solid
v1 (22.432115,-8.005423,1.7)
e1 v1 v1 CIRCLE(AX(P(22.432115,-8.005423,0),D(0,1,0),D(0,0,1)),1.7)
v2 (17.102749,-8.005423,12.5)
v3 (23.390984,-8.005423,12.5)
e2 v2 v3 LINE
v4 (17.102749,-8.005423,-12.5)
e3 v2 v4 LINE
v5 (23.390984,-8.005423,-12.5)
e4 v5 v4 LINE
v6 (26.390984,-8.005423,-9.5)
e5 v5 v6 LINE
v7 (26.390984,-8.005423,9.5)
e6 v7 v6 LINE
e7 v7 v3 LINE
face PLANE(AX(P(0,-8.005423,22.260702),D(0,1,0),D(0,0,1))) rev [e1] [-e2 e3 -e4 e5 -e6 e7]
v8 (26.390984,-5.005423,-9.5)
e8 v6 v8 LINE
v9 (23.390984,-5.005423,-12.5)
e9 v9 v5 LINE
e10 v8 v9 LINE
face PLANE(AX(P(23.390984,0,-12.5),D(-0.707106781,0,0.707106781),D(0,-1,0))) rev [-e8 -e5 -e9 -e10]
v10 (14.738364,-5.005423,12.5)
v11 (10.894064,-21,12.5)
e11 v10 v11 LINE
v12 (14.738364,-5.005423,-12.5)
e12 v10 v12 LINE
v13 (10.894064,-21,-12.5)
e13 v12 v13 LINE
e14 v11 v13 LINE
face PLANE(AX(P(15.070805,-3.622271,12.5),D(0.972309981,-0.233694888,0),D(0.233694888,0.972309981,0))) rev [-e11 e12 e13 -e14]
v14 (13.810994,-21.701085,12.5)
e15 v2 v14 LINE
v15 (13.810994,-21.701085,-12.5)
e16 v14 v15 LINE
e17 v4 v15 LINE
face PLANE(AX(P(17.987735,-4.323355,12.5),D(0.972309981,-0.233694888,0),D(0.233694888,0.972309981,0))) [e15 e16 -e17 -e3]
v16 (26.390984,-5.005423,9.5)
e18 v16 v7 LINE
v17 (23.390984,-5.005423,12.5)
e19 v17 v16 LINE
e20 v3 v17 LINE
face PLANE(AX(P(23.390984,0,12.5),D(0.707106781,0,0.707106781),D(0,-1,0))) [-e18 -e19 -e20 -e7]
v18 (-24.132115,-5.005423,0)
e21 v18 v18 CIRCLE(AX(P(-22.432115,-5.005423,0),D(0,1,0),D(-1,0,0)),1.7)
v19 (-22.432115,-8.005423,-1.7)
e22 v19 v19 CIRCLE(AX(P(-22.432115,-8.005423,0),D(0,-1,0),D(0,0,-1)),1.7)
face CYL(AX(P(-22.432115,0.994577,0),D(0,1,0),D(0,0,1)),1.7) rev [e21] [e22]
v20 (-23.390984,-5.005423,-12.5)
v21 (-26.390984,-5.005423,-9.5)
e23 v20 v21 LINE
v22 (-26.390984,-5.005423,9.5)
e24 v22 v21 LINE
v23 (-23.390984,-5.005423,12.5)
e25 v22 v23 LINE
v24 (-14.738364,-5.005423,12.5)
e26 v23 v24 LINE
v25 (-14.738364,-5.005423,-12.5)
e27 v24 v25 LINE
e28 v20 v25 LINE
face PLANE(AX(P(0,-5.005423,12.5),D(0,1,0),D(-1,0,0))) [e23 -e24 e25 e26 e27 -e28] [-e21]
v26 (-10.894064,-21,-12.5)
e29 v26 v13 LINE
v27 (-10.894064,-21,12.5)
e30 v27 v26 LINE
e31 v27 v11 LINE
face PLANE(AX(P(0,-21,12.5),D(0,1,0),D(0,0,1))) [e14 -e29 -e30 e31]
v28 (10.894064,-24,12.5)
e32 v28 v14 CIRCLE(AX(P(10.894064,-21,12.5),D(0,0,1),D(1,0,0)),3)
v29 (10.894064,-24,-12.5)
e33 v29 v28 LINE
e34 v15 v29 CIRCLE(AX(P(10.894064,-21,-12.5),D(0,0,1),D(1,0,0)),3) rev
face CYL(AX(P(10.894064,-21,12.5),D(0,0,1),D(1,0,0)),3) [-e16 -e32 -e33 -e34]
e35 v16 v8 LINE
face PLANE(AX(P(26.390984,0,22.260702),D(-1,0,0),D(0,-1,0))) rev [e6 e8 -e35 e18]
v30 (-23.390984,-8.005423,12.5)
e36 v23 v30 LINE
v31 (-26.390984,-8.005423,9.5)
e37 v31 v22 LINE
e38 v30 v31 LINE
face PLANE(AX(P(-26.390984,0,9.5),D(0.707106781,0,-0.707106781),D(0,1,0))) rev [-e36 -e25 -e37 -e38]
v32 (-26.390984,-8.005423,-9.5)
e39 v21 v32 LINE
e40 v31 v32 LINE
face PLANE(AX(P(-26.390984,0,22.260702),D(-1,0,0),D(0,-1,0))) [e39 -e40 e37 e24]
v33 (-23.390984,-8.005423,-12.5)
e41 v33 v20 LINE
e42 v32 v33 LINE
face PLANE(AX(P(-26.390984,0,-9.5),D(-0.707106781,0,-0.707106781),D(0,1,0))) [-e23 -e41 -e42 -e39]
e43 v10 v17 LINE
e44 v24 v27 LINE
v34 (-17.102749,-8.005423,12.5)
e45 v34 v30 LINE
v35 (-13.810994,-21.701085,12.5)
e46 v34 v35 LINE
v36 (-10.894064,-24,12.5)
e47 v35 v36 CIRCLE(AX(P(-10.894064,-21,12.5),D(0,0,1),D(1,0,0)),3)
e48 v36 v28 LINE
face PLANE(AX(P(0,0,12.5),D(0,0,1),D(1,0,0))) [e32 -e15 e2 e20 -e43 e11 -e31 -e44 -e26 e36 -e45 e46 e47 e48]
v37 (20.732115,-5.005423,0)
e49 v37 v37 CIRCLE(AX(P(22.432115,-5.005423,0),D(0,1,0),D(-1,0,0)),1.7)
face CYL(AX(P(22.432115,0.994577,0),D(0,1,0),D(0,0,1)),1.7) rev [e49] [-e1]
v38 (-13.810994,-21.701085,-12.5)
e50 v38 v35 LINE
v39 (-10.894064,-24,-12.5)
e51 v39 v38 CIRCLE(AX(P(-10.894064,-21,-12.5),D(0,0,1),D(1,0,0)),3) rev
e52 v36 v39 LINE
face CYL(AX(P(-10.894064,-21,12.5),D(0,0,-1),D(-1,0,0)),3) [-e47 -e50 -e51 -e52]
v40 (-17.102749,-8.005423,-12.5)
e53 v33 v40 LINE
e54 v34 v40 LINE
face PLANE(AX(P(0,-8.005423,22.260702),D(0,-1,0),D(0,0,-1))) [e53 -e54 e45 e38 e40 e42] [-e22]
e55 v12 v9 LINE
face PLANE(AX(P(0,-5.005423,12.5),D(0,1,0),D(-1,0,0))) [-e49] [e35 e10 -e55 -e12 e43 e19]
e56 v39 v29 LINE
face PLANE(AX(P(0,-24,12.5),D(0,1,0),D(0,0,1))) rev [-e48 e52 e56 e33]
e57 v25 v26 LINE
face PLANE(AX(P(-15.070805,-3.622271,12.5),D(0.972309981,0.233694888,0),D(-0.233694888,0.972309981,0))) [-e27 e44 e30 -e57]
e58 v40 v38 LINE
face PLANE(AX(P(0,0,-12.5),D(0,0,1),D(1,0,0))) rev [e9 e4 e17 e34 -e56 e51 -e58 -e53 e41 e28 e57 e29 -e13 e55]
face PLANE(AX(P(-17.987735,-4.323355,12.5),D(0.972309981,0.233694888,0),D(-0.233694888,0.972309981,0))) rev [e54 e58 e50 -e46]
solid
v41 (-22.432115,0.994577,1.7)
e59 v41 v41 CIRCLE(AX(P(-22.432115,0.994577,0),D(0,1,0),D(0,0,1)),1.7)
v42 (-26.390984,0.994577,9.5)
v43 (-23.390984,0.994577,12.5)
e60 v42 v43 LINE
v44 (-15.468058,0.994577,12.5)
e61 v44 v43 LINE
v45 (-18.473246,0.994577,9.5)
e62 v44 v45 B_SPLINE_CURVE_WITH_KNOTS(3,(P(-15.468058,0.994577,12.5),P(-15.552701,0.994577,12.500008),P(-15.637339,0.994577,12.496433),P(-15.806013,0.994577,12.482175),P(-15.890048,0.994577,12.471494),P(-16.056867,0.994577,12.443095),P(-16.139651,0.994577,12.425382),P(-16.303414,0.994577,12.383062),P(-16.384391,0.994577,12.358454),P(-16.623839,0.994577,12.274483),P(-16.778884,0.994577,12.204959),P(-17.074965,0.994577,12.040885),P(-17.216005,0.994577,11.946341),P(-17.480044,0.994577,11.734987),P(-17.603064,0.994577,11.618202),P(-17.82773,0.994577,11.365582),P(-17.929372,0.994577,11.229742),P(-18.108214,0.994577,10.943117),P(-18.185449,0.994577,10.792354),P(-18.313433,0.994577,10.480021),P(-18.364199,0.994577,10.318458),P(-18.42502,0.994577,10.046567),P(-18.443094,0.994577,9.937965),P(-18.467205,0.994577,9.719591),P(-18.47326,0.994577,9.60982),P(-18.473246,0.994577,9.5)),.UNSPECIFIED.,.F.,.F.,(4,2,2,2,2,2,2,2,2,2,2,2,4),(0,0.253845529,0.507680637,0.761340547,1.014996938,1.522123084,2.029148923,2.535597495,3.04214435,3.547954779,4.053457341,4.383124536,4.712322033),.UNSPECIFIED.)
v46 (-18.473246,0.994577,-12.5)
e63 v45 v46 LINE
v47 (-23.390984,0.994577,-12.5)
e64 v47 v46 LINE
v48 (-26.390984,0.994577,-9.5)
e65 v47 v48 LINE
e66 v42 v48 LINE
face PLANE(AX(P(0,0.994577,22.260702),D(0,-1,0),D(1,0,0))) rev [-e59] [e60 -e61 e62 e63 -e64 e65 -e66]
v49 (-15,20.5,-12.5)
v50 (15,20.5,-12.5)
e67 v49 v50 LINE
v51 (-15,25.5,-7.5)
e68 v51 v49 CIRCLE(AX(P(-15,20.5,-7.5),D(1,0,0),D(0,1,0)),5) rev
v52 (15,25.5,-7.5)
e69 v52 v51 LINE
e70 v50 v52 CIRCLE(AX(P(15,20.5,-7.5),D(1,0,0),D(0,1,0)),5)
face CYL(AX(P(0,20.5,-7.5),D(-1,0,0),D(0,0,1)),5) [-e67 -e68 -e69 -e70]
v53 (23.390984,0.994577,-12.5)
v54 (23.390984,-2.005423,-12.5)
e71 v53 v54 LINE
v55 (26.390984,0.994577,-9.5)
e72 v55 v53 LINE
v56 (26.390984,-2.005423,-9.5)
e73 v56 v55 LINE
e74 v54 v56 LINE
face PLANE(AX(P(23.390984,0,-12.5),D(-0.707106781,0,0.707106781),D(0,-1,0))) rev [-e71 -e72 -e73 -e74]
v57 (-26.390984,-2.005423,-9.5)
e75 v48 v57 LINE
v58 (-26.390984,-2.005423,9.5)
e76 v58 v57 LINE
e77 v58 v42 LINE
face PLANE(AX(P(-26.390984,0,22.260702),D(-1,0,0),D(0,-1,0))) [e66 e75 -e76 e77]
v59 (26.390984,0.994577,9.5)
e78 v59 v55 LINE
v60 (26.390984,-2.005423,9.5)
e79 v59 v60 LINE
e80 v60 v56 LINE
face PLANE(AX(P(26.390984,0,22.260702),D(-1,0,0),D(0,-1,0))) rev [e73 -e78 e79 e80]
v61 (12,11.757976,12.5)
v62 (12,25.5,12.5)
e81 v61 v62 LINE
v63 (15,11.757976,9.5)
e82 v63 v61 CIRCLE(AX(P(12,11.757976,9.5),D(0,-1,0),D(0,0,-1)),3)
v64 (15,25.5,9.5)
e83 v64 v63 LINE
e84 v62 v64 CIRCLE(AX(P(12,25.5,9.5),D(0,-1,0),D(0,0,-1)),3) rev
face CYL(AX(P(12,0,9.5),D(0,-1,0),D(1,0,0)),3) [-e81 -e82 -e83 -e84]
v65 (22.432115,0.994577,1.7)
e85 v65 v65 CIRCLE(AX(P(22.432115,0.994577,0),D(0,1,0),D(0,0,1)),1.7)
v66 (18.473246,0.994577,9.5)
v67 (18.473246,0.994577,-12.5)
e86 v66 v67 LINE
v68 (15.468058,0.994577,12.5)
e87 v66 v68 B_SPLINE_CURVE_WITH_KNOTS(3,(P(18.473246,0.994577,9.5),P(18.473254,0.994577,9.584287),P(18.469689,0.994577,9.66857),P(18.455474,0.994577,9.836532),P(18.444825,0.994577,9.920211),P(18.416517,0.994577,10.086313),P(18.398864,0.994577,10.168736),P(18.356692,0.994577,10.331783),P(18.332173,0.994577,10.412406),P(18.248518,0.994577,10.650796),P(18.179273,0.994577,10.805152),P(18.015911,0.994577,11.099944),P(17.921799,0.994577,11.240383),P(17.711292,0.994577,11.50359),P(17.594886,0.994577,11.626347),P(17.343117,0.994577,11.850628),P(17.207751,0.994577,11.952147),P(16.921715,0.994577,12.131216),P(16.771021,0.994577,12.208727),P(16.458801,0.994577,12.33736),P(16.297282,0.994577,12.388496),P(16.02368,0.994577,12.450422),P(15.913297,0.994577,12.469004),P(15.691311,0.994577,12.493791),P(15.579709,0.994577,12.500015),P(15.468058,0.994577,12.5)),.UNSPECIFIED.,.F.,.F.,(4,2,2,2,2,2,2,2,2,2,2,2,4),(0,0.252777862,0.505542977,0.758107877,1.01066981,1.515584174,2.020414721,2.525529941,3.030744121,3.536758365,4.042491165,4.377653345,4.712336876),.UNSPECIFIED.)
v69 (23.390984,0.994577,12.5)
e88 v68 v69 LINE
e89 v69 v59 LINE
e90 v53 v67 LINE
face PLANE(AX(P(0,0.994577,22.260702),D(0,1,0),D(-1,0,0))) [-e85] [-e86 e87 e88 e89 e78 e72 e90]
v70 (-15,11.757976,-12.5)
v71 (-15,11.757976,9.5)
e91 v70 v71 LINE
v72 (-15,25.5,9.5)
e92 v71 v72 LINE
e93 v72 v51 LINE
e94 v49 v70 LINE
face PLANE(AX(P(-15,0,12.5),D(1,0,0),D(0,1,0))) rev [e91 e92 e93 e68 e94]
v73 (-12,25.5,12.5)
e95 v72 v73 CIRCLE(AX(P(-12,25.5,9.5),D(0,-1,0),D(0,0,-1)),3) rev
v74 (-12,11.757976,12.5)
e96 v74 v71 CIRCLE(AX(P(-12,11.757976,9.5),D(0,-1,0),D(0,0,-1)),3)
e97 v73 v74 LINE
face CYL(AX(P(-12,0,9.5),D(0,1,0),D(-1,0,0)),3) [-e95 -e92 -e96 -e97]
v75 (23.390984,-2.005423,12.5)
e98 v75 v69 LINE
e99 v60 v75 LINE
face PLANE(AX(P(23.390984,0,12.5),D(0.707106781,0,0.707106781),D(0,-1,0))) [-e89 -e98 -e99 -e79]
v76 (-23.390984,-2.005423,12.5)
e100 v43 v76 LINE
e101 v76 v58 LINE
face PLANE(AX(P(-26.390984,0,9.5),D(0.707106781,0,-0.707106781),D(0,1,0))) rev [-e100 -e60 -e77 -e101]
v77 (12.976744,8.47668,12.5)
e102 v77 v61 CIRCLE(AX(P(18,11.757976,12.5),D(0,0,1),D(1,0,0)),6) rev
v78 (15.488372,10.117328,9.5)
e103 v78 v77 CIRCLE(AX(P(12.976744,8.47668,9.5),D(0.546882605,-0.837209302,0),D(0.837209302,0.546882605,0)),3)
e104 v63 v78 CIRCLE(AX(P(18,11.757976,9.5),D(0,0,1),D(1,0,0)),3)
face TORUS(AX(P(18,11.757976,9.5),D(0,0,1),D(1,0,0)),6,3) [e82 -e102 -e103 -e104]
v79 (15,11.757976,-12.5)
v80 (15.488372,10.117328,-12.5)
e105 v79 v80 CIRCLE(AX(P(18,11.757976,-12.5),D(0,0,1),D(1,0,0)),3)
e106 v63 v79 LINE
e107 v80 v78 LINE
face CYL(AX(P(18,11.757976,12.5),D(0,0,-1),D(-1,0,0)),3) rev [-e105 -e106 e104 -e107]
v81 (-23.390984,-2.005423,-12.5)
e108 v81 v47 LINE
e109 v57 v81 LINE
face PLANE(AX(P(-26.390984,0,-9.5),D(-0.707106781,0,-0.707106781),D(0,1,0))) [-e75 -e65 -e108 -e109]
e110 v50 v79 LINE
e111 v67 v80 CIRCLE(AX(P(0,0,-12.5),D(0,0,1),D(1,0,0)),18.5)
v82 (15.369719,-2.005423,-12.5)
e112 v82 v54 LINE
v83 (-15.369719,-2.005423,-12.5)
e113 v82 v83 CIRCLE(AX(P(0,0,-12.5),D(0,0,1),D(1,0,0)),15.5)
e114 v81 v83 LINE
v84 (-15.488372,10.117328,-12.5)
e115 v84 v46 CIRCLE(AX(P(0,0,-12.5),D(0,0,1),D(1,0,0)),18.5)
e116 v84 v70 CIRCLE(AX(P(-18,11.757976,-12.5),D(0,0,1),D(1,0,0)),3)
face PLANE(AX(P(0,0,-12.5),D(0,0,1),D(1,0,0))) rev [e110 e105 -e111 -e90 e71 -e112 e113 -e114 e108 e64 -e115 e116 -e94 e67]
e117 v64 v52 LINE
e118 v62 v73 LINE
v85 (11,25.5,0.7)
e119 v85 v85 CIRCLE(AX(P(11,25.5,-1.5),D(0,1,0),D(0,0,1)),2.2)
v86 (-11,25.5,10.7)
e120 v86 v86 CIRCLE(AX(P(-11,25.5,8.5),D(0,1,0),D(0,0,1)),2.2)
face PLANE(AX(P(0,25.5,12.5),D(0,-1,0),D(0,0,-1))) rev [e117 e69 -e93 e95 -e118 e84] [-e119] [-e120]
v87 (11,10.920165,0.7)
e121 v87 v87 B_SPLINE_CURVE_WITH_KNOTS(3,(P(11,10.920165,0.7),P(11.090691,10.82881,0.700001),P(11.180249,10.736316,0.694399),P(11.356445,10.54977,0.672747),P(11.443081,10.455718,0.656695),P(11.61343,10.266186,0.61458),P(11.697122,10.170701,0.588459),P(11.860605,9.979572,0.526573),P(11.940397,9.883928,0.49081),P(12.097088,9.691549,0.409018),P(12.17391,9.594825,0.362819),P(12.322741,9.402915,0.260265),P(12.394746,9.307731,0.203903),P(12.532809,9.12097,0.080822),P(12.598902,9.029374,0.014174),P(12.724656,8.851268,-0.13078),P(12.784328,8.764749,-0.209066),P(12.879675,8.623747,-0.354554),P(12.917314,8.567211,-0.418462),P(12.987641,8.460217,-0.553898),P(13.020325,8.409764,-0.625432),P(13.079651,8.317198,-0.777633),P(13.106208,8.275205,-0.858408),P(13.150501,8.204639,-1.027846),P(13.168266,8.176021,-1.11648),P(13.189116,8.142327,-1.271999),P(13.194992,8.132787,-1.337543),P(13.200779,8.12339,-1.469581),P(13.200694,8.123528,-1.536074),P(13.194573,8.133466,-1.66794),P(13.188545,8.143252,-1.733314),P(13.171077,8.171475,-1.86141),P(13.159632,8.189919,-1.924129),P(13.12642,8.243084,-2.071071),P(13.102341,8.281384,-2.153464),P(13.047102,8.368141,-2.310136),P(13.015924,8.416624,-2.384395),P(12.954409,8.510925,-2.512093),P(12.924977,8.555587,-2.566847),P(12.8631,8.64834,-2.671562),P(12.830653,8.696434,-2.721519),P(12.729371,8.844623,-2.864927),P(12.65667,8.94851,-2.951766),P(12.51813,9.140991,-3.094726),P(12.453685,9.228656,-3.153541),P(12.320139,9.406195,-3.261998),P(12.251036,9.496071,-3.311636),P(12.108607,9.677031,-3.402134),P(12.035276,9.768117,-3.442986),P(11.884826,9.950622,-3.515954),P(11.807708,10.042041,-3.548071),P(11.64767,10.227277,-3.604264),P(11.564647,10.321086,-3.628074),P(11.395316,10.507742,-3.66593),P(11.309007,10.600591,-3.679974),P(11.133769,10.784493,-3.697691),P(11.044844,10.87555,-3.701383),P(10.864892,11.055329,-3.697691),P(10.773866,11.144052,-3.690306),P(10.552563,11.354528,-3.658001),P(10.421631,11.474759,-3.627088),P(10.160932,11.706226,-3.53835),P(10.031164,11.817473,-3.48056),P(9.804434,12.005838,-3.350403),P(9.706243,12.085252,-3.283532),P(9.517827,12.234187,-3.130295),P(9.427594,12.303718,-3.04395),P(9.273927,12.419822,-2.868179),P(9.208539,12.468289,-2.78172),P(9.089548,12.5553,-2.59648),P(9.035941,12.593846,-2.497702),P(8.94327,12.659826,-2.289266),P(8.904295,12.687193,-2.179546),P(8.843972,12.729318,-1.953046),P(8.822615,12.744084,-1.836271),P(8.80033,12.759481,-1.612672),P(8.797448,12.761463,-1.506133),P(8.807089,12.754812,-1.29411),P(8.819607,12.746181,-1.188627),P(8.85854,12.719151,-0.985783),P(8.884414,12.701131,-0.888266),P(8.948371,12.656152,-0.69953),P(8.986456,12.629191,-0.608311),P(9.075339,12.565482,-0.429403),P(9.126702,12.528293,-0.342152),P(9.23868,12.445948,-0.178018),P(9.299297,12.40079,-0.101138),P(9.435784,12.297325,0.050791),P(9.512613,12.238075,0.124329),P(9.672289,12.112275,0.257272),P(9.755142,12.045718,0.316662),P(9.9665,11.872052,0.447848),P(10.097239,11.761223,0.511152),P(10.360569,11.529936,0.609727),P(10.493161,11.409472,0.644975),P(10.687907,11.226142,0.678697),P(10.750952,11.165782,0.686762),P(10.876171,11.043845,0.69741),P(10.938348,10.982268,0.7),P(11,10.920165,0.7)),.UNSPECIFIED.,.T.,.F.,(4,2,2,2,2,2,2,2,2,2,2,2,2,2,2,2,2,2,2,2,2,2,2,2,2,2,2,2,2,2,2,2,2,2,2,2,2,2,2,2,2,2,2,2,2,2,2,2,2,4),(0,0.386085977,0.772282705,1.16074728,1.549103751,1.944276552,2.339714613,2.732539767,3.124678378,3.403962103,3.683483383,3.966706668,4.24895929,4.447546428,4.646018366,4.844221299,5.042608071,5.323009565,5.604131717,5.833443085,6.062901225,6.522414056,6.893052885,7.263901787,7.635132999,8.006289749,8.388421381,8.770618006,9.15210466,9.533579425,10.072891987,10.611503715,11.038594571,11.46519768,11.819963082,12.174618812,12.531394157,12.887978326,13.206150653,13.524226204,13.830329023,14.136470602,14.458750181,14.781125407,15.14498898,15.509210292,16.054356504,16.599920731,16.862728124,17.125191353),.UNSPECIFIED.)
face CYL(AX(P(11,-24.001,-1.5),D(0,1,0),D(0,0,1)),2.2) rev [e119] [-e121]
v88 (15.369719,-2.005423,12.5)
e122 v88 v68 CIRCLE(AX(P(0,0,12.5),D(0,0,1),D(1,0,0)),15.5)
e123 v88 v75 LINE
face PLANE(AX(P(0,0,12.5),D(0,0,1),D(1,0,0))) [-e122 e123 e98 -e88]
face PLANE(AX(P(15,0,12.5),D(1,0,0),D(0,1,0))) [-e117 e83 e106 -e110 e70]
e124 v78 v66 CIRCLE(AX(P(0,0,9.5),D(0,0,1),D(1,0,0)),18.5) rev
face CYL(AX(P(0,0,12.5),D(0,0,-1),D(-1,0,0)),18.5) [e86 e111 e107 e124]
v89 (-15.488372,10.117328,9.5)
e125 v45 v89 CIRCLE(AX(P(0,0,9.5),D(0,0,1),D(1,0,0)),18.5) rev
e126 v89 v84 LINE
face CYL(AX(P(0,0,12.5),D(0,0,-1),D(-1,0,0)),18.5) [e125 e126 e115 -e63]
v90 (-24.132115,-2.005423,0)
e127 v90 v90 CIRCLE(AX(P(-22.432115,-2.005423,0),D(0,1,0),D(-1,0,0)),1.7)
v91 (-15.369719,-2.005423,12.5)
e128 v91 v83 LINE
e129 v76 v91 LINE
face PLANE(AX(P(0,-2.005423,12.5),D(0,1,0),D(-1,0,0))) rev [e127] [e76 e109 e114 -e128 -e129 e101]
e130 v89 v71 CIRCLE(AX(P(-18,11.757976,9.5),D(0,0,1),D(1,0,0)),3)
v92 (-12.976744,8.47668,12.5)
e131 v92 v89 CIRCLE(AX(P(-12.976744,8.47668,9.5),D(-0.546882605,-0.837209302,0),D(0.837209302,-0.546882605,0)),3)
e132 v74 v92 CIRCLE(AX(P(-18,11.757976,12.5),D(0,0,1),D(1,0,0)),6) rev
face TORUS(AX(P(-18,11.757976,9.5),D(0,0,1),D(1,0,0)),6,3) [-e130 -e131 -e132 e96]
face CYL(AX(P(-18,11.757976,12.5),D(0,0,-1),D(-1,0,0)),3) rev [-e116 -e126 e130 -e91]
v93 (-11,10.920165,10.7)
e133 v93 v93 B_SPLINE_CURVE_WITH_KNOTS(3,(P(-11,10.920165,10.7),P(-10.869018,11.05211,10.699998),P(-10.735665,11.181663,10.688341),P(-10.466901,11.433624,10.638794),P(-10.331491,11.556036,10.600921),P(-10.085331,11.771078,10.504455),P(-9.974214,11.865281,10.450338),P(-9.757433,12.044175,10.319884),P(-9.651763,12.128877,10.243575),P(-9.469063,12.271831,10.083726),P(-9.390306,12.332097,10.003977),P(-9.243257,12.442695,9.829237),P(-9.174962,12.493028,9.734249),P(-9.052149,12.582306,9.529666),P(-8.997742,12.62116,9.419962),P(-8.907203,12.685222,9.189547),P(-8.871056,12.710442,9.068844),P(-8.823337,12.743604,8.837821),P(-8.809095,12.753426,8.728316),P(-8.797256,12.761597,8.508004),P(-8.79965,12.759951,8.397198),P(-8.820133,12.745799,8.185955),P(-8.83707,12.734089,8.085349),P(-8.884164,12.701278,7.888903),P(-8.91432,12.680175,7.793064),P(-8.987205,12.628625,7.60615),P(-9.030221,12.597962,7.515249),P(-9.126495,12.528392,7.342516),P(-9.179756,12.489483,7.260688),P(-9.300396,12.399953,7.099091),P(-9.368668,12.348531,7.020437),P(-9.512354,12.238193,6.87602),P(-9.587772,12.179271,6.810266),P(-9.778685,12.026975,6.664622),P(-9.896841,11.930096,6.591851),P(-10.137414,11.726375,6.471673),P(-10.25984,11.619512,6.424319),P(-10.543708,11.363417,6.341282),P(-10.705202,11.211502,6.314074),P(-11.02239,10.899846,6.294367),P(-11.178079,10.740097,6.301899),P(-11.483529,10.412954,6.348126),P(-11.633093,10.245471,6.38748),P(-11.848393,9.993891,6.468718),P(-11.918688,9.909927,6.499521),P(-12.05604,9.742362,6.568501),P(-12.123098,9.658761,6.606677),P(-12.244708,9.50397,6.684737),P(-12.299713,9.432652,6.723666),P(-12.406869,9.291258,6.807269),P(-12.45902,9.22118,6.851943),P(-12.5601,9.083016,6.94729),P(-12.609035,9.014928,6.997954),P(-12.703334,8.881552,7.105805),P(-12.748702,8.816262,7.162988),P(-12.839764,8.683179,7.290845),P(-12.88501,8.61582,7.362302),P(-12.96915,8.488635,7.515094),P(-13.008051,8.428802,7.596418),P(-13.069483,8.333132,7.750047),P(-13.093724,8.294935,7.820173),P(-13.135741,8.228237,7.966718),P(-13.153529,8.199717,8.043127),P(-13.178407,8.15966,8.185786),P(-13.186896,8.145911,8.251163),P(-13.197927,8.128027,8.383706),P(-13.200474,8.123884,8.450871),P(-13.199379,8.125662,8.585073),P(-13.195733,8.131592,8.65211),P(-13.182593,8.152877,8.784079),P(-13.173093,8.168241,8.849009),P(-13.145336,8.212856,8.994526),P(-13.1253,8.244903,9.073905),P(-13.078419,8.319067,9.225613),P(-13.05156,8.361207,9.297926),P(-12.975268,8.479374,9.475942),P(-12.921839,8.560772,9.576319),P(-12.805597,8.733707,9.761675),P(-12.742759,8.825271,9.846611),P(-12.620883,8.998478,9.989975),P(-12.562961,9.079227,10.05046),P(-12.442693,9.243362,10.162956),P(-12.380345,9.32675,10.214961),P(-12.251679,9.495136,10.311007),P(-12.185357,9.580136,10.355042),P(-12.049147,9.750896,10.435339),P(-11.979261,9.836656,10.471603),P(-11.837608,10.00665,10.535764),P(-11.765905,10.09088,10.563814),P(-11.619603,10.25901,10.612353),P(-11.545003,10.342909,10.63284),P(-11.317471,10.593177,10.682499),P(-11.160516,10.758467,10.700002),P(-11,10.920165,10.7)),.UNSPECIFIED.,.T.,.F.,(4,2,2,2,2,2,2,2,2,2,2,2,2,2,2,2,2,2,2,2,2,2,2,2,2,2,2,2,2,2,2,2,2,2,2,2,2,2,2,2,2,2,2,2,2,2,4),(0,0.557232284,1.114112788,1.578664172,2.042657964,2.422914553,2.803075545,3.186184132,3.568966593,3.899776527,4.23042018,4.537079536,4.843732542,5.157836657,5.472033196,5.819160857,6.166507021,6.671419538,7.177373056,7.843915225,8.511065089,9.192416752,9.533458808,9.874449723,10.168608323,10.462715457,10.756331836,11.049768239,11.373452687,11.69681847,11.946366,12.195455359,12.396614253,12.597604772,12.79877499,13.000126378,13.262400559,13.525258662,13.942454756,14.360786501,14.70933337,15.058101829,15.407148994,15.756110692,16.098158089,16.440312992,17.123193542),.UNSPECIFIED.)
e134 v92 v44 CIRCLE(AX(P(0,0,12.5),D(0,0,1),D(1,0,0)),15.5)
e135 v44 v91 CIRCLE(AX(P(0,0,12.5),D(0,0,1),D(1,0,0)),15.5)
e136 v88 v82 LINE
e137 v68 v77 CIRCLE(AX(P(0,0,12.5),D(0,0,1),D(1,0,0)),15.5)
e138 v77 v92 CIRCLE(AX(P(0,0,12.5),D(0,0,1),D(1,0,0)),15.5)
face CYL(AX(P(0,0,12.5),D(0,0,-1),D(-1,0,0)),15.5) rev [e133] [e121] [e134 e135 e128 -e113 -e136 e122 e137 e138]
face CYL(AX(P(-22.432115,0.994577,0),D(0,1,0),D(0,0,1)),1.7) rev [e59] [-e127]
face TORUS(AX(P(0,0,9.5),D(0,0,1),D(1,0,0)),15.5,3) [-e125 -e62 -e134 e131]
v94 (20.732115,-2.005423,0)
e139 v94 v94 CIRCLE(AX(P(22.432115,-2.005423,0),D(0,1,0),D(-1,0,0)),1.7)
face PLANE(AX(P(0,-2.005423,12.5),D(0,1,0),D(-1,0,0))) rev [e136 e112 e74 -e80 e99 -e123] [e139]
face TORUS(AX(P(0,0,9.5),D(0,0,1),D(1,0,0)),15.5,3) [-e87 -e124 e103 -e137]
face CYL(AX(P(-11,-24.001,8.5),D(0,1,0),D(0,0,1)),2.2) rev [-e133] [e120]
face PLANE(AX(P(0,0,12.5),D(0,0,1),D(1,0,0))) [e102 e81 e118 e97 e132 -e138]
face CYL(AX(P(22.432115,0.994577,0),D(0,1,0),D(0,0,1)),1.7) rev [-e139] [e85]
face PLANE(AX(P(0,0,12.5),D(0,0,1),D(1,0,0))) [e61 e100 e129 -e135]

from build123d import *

# Parameters (mm, degrees)
BOSS_EXTRUDE1_DEPTH     = 12.5
BOSS_EXTRUDE1_2_DEPTH   = 12.5
BOSS_EXTRUDE4_START     = -12.5
SKETCH9_W               = 9.28823465
SKETCH9_H               = 3
BOSS_EXTRUDE4_DEPTH     = 25
M3_CLEARANCE_HOLE1_D    = 3.4
CHAMFER1_SIZE           = 3
CHAMFER2_SIZE           = 3
FILLET1_R               = 3
FILLET2_R               = 3
CUT_EXTRUDE1_REACH      = 59.472
CUT_EXTRUDE1_END_RADIUS = 15.5
SKETCH15_R              = 2.2
FILLET3_R               = 5
FILLET4_R               = 3


with BuildPart() as part:
    # Sketch2 → Boss-Extrude1 (new, symmetric)
    with BuildSketch(Plane.XY):
        Polygon((-10.894064201, -21), (-14.73836373, -5.005423315), (-17.823799504, -5.005423315), (-13.258449409, -24), (13.258449409, -24), (17.823799504, -5.005423315), (14.73836373, -5.005423315), (10.894064201, -21), align=None)
    extrude(amount=BOSS_EXTRUDE1_DEPTH, both=True)



with BuildPart() as body_2:
    # Sketch2 → Boss-Extrude1 2 (new, symmetric)
    with BuildSketch(Plane.XY):
        with BuildLine():
            Line((-18.390983588, -2.005423315), (-15.369719494, -2.005423315))
            ThreePointArc((-15.369719494, -2.005423315), (0, 15.5), (15.369719494, -2.005423315))
            Line((15.369719494, -2.005423315), (18.390983588, -2.005423315))
            ThreePointArc((18.390983588, -2.005423315), (17.886166252, 4.725997968), (15, 10.828203914))
            Line((15, 10.828203914), (15, 25.5))
            Line((15, 25.5), (-15, 25.5))
            Line((-15, 25.5), (-15, 10.828203914))
            ThreePointArc((-15, 10.828203914), (-17.886166252, 4.725997968), (-18.390983588, -2.005423315))
        make_face()
    extrude(amount=BOSS_EXTRUDE1_2_DEPTH, both=True)


with BuildPart() as part_1:
    add(part.part)

    add(body_2.part)  # Boss-Extrude4 merges body 2
    # Sketch9 → Boss-Extrude4 (add)
    with BuildSketch(Plane.XY.offset(BOSS_EXTRUDE4_START)):
        with Locations((21.746866263, -0.505423315)):
            Rectangle(SKETCH9_W, SKETCH9_H)
        with Locations((21.746866263, -6.505423315)):
            Rectangle(SKETCH9_W, SKETCH9_H)
        with Locations((-21.746866263, -0.505423315)):
            Rectangle(SKETCH9_W, SKETCH9_H)
        with Locations((-21.746866263, -6.505423315)):
            Rectangle(SKETCH9_W, SKETCH9_H)
    extrude(amount=BOSS_EXTRUDE4_DEPTH)

    # M3 Clearance Hole1 (through all)
    with Locations(Plane(origin=(0, 0.994576685, 0), x_dir=(1, 0, 0), z_dir=(0, 1, 0))):
        with Locations((-22.432114786, 0), (22.432114786, 0)):
            Hole(M3_CLEARANCE_HOLE1_D / 2)

    # Chamfer1
    chamfer1_edges = [part_1.edges().sort_by_distance(p)[0] for p in [
        (26.390983588, -0.505423315, 12.5),
        (26.390983588, -0.505423315, -12.5),
        (-26.390983588, -0.505423315, 12.5),
        (-26.390983588, -0.505423315, -12.5),
    ]]
    chamfer(chamfer1_edges, length=CHAMFER1_SIZE)

    # Chamfer2
    chamfer2_edges = [part_1.edges().sort_by_distance(p)[0] for p in [
        (26.390983588, -6.505423315, 12.5),
        (26.390983588, -6.505423315, -12.5),
        (-26.390983588, -6.505423315, 12.5),
        (-26.390983588, -6.505423315, -12.5),
    ]]
    chamfer(chamfer2_edges, length=CHAMFER2_SIZE)

    # Fillet1
    fillet1_edges = [part_1.edges().sort_by_distance(p)[0] for p in [
        (13.258449409, -24, 0),
        (-13.258449409, -24, 0),
    ]]
    fillet(fillet1_edges, radius=FILLET1_R)

    # Fillet2
    fillet2_edges = [part_1.edges().sort_by_distance(p)[0] for p in [
        (15, 10.828203914, 0),
        (-15, 10.828203914, 0),
    ]]
    fillet(fillet2_edges, radius=FILLET2_R)

    # Cut-Extrude1: up to this cylinder (the profile starts outside it)
    cut_extrude1_end = Plane(origin=(0, 0, 3.5), z_dir=(0, 0, -1)) * Cylinder(CUT_EXTRUDE1_END_RADIUS, 160.944, mode=Mode.PRIVATE)
    # Sketch15 → Cut-Extrude1 (cut, up to the surface)
    with BuildSketch(Plane(origin=(0, 25.5, 0), x_dir=(1, 0, 0), z_dir=(0, 1, 0)), mode=Mode.PRIVATE) as cut_extrude1_sk1:
        with Locations(Location((-11, -8.5, 0), (0, 0, 270))):
            Circle(SKETCH15_R)
    cut_extrude1_tool1 = extrude(cut_extrude1_sk1.sketch, amount=-CUT_EXTRUDE1_REACH, mode=Mode.PRIVATE) - cut_extrude1_end
    add(cut_extrude1_tool1.solids().sort_by_distance((-11, 25.5, 8.5))[0], mode=Mode.SUBTRACT)
    # Sketch15 → Cut-Extrude1 (cut, up to the surface)
    with BuildSketch(Plane(origin=(0, 25.5, 0), x_dir=(1, 0, 0), z_dir=(0, 1, 0)), mode=Mode.PRIVATE) as cut_extrude1_sk2:
        with Locations(Location((11, 1.5, 0), (0, 0, 270))):
            Circle(SKETCH15_R)
    cut_extrude1_tool2 = extrude(cut_extrude1_sk2.sketch, amount=-CUT_EXTRUDE1_REACH, mode=Mode.PRIVATE) - cut_extrude1_end
    add(cut_extrude1_tool2.solids().sort_by_distance((11, 25.5, -1.5))[0], mode=Mode.SUBTRACT)

    # Fillet3
    fillet3_edges = [part_1.edges().sort_by_distance(p)[0] for p in [
        (0, 25.5, -12.5),
    ]]
    fillet(fillet3_edges, radius=FILLET3_R)

    # Fillet4
    fillet4_edges = [part_1.edges().sort_by_distance(p)[0] for p in [
        (-17.582776357, 5.752910183, 12.5),
        (15.124684042, 10.902079913, 12.5),
        (-15.124684042, 10.902079913, 12.5),
        (17.582776357, 5.752910183, 12.5),
        (15, 18.628988008, 12.5),
        (-15, 18.628988008, 12.5),
    ]]
    fillet(fillet4_edges, radius=FILLET4_R - 0.0001)  # a hair under: the kernel refuses the full size


solid = part_1.part
